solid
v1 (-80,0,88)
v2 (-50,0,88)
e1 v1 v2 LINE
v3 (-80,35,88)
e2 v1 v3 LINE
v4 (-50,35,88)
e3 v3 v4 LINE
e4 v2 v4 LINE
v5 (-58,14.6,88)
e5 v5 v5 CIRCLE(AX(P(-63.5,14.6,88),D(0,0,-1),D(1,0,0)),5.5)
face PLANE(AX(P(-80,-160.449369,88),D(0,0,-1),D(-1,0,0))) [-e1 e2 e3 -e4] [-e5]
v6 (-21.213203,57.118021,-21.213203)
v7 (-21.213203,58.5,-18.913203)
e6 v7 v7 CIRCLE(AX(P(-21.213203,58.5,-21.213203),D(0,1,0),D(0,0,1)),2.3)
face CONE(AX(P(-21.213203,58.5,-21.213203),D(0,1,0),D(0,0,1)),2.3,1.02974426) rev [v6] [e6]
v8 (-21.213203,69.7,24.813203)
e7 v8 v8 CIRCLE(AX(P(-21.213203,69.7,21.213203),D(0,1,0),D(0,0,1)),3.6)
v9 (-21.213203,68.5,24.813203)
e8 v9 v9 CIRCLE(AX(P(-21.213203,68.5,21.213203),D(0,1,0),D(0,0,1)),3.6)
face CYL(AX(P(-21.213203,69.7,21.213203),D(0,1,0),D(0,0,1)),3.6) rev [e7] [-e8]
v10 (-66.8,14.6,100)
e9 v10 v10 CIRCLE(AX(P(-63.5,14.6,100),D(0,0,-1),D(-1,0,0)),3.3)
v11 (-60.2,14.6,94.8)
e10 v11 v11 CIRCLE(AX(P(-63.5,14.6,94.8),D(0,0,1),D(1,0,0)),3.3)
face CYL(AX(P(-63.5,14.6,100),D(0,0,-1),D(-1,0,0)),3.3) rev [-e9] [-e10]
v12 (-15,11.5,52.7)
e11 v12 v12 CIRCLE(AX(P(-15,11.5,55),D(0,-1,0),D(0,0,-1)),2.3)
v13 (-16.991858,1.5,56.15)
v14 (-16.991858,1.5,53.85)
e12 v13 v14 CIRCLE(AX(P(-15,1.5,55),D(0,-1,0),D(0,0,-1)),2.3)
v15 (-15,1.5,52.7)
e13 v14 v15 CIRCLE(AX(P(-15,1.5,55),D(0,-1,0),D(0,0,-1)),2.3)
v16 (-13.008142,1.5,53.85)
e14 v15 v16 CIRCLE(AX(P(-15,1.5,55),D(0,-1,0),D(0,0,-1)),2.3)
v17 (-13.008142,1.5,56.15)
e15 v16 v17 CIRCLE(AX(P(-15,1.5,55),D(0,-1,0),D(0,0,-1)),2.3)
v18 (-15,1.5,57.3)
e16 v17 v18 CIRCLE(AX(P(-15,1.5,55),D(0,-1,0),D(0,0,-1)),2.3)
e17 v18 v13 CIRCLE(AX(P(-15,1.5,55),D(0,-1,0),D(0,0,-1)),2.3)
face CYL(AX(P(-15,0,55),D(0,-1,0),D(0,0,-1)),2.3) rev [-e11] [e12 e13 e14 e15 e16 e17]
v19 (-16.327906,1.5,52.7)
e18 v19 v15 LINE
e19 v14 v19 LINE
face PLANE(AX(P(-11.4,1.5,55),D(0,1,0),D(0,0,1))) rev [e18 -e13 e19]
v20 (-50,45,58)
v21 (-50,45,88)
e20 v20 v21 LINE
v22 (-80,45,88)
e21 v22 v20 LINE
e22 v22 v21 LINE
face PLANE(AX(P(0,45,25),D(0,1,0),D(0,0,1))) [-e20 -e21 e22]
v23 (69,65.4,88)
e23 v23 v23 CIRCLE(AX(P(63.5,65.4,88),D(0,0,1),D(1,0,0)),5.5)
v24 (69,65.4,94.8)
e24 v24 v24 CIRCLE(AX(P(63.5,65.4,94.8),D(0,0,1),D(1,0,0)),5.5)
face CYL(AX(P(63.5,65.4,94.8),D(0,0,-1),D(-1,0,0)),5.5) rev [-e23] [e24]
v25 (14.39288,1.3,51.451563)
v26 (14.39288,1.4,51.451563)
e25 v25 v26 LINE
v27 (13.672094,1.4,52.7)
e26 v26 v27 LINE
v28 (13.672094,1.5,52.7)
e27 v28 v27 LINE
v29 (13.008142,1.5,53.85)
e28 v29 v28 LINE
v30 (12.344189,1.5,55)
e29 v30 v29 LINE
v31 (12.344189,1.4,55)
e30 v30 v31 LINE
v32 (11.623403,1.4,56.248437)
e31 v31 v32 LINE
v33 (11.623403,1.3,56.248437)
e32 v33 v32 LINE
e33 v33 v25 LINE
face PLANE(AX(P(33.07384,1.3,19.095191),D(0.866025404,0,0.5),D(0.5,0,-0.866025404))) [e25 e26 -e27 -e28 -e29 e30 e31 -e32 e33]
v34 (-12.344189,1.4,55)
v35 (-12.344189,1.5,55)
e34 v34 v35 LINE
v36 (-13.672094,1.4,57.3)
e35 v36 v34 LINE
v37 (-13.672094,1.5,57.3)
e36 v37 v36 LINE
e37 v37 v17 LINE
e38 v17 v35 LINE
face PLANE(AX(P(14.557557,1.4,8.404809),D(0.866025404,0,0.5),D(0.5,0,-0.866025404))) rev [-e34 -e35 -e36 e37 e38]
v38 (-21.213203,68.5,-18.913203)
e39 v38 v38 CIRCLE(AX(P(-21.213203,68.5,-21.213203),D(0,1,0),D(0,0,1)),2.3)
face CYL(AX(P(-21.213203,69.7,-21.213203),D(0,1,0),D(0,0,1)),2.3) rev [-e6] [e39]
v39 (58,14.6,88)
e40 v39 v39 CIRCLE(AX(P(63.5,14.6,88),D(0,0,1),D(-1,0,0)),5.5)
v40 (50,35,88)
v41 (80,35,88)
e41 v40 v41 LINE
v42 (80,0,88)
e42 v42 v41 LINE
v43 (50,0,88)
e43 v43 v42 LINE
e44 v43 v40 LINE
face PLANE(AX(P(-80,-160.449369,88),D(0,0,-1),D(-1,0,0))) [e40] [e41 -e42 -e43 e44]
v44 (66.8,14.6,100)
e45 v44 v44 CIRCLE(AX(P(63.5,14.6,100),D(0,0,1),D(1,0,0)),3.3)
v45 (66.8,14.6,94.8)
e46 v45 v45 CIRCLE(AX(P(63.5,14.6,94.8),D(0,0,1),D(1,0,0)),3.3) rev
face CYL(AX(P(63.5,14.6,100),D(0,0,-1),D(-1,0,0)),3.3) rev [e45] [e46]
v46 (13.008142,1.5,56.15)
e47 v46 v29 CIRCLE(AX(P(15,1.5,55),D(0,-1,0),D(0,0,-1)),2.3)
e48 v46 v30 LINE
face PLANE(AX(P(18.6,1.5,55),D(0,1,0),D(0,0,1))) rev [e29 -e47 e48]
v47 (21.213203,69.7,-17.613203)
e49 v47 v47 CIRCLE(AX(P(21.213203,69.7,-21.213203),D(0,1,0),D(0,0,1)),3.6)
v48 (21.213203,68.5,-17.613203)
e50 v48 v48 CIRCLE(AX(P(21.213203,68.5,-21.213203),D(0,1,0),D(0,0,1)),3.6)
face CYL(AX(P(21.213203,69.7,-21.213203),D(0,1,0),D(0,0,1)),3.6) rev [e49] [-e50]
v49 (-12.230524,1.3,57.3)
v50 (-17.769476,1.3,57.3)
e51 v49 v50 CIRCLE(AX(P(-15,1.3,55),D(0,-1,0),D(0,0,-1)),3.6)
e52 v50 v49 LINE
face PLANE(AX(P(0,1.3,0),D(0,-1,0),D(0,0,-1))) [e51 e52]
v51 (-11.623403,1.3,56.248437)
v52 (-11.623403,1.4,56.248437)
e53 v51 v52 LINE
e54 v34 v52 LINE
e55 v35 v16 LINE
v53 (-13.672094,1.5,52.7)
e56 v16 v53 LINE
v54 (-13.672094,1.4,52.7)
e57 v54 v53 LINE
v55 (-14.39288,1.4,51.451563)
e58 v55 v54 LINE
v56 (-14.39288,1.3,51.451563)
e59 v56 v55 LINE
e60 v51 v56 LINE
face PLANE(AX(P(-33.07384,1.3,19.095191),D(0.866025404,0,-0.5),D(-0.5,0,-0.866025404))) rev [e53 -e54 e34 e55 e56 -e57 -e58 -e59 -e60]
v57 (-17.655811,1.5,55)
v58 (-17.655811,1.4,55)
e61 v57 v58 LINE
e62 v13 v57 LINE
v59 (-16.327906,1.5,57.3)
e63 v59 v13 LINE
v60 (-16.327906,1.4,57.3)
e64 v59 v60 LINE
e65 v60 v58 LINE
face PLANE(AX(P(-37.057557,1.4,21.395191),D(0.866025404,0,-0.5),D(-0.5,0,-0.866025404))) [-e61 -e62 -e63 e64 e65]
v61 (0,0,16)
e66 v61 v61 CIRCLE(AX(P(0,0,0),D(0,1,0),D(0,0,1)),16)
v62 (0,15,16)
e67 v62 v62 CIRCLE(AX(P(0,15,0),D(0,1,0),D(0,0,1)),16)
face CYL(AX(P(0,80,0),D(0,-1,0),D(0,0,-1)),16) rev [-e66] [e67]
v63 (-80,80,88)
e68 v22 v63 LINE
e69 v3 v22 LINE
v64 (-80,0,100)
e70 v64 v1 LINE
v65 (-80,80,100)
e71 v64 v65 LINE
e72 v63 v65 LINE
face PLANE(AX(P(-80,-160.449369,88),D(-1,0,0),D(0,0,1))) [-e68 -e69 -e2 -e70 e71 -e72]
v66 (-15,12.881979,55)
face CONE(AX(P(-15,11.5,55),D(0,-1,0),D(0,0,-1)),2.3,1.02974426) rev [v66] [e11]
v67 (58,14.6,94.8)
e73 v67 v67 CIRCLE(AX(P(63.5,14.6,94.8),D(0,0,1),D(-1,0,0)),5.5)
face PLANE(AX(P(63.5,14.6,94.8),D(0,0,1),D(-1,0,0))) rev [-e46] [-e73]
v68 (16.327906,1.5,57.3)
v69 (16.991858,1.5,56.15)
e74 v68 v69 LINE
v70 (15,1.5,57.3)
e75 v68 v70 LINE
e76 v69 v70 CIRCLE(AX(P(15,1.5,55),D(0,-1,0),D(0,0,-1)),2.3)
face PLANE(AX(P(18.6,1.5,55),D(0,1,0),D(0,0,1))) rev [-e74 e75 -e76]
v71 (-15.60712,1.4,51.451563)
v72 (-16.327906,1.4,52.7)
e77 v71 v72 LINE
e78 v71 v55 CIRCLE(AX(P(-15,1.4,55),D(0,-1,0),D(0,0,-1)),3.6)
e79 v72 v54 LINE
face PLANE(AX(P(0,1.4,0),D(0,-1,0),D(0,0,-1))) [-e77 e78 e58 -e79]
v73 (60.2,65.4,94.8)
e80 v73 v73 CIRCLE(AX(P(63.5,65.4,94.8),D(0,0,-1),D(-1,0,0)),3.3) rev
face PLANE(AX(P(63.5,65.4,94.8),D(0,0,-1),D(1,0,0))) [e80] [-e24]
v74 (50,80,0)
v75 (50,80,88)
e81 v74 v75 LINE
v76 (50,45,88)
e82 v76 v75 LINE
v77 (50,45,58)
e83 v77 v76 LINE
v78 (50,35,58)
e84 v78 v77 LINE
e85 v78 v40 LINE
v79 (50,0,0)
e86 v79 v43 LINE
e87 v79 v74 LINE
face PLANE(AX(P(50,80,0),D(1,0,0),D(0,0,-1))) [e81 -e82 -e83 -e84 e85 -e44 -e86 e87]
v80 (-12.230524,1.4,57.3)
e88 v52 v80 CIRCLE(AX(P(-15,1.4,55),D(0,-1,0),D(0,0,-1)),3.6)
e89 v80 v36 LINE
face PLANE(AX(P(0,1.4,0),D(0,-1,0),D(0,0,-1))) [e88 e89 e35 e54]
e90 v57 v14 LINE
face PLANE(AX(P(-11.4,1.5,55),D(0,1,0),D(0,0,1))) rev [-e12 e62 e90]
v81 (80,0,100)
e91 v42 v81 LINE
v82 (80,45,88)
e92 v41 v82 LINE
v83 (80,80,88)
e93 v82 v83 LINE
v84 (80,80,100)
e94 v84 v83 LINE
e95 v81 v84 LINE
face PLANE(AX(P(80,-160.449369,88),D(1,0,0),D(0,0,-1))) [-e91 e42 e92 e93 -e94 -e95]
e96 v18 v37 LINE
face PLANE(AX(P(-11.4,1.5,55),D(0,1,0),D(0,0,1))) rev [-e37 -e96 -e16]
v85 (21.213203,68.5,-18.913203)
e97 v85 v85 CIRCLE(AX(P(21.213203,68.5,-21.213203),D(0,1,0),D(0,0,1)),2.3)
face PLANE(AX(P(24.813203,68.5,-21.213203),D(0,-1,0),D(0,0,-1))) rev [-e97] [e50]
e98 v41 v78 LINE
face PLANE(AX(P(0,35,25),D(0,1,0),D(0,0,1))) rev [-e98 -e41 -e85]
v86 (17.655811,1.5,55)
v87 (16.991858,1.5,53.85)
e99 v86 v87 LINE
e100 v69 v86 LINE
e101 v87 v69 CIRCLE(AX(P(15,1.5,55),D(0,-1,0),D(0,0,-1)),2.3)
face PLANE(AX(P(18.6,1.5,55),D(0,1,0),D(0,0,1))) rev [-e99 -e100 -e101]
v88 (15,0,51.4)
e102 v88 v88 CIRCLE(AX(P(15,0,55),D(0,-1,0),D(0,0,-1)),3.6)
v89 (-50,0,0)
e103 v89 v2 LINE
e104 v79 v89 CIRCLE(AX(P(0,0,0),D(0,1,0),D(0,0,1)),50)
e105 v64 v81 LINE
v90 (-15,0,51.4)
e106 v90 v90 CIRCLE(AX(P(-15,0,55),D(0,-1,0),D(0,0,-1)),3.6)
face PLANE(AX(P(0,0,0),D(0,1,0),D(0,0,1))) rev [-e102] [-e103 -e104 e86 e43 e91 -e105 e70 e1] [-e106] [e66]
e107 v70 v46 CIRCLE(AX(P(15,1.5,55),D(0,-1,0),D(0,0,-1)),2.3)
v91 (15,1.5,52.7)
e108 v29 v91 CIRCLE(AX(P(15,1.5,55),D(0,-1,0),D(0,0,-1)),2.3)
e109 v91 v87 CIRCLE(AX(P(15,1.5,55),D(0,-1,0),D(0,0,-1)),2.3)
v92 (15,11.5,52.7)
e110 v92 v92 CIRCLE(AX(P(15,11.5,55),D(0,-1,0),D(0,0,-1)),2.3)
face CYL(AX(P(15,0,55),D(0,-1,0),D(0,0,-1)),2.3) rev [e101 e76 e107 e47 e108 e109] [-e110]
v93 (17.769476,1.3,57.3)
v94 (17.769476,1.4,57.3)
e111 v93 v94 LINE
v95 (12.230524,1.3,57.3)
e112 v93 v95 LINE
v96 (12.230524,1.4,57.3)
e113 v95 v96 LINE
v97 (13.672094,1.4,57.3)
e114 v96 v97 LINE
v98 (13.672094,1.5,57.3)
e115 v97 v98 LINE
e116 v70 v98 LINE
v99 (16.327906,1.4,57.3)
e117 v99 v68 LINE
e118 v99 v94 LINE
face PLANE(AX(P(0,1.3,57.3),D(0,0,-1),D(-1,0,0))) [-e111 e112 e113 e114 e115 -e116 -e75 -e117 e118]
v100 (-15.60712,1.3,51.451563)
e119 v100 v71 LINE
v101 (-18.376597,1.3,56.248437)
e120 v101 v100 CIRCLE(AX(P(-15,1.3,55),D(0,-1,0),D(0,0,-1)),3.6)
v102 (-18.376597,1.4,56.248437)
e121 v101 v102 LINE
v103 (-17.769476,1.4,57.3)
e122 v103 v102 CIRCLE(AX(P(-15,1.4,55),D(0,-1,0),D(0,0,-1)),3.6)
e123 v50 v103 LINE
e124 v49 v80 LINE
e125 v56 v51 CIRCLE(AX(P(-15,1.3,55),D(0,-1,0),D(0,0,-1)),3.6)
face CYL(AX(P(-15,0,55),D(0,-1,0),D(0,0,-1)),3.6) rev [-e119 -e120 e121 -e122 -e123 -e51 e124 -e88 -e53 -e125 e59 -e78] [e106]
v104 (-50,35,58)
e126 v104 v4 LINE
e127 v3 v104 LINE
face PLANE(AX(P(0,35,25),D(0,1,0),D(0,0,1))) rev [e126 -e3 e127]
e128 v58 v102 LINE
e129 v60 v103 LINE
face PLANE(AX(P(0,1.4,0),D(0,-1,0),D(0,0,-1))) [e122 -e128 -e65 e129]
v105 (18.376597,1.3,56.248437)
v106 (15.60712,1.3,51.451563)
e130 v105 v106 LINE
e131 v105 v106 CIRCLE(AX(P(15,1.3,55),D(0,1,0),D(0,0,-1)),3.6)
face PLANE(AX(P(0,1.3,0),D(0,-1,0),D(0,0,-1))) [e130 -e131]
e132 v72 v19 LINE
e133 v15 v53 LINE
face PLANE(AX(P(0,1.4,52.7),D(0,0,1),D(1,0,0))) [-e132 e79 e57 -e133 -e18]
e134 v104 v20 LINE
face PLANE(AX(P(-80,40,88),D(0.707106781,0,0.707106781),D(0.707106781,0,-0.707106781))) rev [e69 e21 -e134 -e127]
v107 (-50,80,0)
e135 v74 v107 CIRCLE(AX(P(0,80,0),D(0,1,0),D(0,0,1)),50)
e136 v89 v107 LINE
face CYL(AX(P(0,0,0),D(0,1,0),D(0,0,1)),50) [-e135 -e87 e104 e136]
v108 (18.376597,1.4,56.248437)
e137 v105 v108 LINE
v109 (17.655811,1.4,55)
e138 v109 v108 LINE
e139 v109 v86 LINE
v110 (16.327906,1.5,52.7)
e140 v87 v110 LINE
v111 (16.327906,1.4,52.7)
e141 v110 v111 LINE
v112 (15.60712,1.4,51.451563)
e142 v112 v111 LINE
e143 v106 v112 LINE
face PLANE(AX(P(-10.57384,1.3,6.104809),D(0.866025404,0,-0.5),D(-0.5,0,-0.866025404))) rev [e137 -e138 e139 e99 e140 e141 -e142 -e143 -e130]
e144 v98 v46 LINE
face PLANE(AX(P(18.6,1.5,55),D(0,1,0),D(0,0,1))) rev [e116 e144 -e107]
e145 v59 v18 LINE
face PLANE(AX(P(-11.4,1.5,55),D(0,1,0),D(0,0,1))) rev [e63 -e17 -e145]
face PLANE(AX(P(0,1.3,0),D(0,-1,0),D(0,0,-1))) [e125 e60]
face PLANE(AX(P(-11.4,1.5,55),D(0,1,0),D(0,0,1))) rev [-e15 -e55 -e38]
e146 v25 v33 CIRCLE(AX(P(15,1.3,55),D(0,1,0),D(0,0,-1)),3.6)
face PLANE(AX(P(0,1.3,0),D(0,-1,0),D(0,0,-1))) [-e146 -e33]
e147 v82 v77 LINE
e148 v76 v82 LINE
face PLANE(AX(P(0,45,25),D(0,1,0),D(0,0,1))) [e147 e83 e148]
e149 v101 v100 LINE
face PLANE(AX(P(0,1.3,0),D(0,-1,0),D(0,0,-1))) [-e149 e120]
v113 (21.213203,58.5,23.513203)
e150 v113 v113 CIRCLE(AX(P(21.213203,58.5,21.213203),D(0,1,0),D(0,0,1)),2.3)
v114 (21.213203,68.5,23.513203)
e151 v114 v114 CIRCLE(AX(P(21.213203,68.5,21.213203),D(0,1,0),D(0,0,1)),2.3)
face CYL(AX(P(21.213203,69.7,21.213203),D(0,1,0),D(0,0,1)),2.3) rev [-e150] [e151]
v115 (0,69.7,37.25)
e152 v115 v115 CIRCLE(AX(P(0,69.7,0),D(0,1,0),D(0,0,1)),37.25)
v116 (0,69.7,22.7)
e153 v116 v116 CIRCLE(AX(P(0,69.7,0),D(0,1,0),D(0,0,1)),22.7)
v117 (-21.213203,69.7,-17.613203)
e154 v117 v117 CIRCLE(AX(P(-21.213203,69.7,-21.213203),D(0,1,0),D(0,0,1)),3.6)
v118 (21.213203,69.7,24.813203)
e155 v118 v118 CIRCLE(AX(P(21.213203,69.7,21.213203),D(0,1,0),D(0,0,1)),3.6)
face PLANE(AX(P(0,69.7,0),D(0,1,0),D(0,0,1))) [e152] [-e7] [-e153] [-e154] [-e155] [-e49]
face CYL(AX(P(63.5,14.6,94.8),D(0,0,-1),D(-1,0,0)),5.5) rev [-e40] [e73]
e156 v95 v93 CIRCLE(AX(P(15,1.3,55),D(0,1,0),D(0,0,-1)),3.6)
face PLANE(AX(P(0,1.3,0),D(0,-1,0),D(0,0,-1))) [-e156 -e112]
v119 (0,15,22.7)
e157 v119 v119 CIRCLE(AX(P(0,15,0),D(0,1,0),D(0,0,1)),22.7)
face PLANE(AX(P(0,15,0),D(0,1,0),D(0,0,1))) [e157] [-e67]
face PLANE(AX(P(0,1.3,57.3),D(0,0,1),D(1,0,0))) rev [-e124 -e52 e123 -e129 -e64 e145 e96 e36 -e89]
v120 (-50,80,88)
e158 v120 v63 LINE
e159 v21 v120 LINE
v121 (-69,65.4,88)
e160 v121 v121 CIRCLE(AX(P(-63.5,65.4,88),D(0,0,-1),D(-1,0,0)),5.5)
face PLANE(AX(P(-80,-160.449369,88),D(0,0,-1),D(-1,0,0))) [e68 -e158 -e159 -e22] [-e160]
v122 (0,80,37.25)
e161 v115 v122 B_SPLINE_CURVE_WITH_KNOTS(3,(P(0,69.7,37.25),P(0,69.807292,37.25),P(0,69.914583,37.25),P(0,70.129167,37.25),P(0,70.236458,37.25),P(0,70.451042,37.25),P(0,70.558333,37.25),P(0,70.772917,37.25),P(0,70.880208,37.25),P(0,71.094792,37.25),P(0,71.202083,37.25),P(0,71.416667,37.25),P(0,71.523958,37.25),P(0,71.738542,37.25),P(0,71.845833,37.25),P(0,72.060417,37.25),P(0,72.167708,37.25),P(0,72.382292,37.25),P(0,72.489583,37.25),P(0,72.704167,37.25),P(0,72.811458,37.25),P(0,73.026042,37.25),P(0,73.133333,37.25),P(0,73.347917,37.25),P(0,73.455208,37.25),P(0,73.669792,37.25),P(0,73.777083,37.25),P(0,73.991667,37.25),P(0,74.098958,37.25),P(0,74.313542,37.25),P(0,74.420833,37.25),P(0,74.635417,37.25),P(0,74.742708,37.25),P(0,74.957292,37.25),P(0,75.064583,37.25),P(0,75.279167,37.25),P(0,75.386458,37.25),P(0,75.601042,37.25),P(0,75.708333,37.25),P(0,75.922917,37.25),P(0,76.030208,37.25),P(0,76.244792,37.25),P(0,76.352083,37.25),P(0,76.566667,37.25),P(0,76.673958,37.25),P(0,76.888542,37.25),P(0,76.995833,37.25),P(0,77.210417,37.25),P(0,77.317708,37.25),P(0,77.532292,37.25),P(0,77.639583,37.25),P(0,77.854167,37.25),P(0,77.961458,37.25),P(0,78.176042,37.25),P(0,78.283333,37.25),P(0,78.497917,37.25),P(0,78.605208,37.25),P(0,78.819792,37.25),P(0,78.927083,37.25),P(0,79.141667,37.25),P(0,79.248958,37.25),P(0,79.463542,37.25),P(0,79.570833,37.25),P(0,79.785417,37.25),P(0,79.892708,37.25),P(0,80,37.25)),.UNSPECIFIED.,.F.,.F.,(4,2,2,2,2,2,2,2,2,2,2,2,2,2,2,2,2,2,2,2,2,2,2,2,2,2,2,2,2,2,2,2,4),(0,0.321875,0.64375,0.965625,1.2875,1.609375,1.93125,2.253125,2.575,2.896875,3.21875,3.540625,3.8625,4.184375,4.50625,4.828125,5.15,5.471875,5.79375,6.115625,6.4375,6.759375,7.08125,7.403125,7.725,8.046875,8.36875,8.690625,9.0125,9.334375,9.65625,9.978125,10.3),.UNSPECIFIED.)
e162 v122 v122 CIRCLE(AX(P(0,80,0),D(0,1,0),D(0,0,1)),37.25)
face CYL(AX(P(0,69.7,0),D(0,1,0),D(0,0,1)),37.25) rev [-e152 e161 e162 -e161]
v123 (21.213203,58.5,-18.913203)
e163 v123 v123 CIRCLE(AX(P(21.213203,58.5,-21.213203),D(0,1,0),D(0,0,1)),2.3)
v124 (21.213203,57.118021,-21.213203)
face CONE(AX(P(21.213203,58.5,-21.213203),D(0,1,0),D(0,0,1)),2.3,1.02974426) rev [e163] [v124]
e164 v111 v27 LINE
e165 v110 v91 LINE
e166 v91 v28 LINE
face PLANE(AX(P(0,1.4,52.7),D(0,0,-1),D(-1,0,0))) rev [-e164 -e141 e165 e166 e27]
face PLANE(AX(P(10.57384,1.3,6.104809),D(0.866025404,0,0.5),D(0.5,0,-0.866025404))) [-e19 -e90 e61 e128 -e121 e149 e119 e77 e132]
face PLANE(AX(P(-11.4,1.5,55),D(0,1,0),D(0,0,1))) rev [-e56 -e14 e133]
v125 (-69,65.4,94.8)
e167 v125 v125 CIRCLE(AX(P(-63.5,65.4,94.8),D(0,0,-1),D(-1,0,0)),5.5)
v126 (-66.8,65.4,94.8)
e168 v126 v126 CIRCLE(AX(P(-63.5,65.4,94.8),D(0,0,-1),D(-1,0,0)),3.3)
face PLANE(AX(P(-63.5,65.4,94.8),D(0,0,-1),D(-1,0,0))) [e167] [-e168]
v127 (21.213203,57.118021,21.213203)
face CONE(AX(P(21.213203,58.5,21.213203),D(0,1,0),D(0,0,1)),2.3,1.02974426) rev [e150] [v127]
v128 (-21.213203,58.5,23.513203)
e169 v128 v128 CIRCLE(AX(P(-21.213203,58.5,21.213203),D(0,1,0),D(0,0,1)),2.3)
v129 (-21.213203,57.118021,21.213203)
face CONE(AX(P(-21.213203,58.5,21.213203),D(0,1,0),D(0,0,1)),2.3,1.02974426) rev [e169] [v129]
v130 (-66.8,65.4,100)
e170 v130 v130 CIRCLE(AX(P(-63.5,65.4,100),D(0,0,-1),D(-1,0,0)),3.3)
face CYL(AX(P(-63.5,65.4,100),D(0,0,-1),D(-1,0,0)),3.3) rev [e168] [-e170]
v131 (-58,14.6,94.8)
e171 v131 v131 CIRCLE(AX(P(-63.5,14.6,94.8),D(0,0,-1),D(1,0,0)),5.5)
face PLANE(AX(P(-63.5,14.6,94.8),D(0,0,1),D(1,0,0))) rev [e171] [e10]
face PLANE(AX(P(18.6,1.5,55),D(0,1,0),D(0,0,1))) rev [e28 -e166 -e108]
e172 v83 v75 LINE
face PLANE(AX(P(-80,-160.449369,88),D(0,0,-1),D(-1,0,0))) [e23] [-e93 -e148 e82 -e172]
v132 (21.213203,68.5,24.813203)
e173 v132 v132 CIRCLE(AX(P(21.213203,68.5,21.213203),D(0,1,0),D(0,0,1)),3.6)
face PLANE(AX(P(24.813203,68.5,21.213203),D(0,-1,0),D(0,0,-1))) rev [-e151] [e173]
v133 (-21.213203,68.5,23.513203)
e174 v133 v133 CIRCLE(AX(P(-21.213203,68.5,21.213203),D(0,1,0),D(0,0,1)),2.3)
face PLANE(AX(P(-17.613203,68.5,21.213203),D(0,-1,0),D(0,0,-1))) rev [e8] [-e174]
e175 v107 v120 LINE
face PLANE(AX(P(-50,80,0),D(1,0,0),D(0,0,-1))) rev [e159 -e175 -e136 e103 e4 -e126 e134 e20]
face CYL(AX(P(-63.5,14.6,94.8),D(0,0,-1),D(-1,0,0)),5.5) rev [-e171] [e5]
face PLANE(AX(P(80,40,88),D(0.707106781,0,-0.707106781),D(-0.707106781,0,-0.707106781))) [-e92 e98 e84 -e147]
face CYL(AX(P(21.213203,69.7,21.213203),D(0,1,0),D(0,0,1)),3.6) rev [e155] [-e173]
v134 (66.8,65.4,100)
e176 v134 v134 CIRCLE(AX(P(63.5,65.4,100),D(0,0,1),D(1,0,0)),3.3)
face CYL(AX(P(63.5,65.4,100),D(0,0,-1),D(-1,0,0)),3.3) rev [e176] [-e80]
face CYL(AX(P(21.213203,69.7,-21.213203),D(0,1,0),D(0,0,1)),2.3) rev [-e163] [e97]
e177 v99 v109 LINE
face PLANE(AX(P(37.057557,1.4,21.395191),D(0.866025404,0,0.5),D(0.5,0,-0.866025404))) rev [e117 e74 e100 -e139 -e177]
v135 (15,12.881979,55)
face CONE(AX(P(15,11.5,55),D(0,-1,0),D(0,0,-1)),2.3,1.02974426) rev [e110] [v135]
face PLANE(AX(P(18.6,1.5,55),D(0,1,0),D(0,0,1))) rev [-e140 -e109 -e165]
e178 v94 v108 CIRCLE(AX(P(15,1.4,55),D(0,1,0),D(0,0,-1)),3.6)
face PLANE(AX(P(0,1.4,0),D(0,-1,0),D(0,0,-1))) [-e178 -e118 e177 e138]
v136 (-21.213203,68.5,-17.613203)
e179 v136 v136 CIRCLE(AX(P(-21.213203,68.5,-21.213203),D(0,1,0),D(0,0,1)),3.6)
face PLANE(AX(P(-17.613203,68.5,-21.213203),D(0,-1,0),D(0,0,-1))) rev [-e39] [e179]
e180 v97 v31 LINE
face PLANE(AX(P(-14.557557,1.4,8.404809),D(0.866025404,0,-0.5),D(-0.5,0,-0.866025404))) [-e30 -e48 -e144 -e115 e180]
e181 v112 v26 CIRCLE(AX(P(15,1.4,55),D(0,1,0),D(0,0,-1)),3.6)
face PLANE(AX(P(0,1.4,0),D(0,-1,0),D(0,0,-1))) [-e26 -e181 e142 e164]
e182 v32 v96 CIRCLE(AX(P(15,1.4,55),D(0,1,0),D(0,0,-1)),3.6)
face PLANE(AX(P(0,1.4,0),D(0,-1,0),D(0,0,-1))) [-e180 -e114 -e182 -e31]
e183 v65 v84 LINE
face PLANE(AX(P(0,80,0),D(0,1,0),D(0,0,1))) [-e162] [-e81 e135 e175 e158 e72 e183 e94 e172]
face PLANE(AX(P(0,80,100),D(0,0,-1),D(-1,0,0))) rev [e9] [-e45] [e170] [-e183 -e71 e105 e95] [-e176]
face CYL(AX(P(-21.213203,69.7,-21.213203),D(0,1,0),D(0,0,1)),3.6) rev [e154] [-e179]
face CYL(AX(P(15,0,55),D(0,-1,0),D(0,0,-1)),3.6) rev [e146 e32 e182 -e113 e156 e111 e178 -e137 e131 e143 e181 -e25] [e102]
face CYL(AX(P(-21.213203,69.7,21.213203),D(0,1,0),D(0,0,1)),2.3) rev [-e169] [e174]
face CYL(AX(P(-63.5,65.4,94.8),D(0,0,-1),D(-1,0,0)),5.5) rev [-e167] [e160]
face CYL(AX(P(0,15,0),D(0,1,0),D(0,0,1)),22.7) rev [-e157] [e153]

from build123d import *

# Parameters (mm, degrees)
EXTRUDE_1_DEPTH          = 80
SKETCH_3_R               = 37.25
CUT_EXTRUDE_1_DEPTH      = 10.3
SKETCH_4_R               = 22.7
CUT_EXTRUDE_2_DEPTH      = 65
CUT_EXTRUDE_3_DEPTH      = 138.477270849
SKETCH_6_W               = 160
SKETCH_6_H               = 12
EXTRUDE_2_DEPTH          = 80
SKETCH_8_R               = 5.5
CUT_EXTRUDE_4_DEPTH      = 6.8
SKETCH_9_R               = 3.3
CUT_EXTRUDE_5_DEPTH      = 179.44887223
RIB_START                = -5
RIB_1_DEPTH              = 10
PATTERN_CIRCULAR_1_COUNT = 4
EXTRUDE_3_DEPTH          = 0.1
EXTRUDE_4_DEPTH          = 0.2


# Read off the part's stored shape, not the designer's step: 筋1, 高级异型孔1, 高级异型孔2
with BuildPart() as part:
    # 草图1 → 凸台-拉伸1 (new body)
    with BuildSketch(Plane(origin=(0, 0, 0), x_dir=(1, 0, 0), z_dir=(0, 1, 0))):
        with BuildLine():
            Line((-50, -100), (0, -100))
            Line((0, -100), (0, -37.3))
            ThreePointArc((0, -37.3), (-37.3, 0), (0, 37.3))
            Line((0, 37.3), (0, 60))
            Line((0, 60), (-50, 60))
            Line((-50, 60), (-50, -100))
        make_face()
        with BuildLine():
            Line((0, -37.3), (0, -100))
            Line((0, -100), (50, -100))
            Line((50, -100), (50, 60))
            Line((50, 60), (0, 60))
            Line((0, 60), (0, 37.3))
            ThreePointArc((0, 37.3), (26.375082938, 26.375082938), (37.3, 0))
            ThreePointArc((37.3, 0), (26.375082938, -26.375082938), (0, -37.3))
        make_face()
        with BuildLine():
            ThreePointArc((0, 37.3), (-37.3, 0), (0, -37.3))
            Line((0, -37.3), (0, -16))
            ThreePointArc((0, -16), (-16, 0), (0, 16))
            Line((0, 16), (0, 37.3))
        make_face()
        with BuildLine():
            Line((0, -16), (0, -37.3))
            ThreePointArc((0, -37.3), (26.375082938, -26.375082938), (37.3, 0))
            ThreePointArc((37.3, 0), (26.375082938, 26.375082938), (0, 37.3))
            Line((0, 37.3), (0, 16))
            ThreePointArc((0, 16), (11.313708499, 11.313708499), (16, 0))
            ThreePointArc((16, 0), (11.313708499, -11.313708499), (0, -16))
        make_face()
    extrude(amount=EXTRUDE_1_DEPTH)

    # 草图3 → 切除-拉伸1 (cut)
    with BuildSketch(Plane(origin=(0, 80, 0), x_dir=(1, 0, 0), z_dir=(0, 1, 0))):
        with Locations(Location((0, 0, 0), (0, 0, 270))):
            Circle(SKETCH_3_R)
    extrude(amount=-CUT_EXTRUDE_1_DEPTH, mode=Mode.SUBTRACT)

    # 草图4 → 切除-拉伸2 (cut)
    with BuildSketch(Plane(origin=(0, 80, 0), x_dir=(1, 0, 0), z_dir=(0, 1, 0))):
        with Locations(Location((0, 0, 0), (0, 0, 270))):
            Circle(SKETCH_4_R)
    extrude(amount=-CUT_EXTRUDE_2_DEPTH, mode=Mode.SUBTRACT)

    # 草图5 → 切除-拉伸3 (cut, through all)
    with BuildSketch(Plane(origin=(0, 80, 0), x_dir=(1, 0, 0), z_dir=(0, 1, 0))):
        with BuildLine():
            ThreePointArc((-50, 1.43e-07), (7.1e-08, 50), (50, 0))
            Line((50, 0), (50, 60))
            Line((50, 60), (-50, 60))
            Line((-50, 60), (-50, 1.43e-07))
        make_face()
    extrude(amount=-CUT_EXTRUDE_3_DEPTH, mode=Mode.SUBTRACT)

    # 草图6 → 凸台-拉伸2 (add)
    with BuildSketch(Plane(origin=(0, 80, 0), x_dir=(1, 0, 0), z_dir=(0, 1, 0))):
        with Locations((0, -94)):
            Rectangle(SKETCH_6_W, SKETCH_6_H)
    extrude(amount=-EXTRUDE_2_DEPTH)

    # 草图8 → 切除-拉伸4 (cut)
    with BuildSketch(Plane(origin=(0, 0, 88), x_dir=(-1, 0, 0), z_dir=(0, 0, -1))):
        with Locations((63.5, 65.4)):
            Circle(SKETCH_8_R)
        with Locations(Location((63.5, 14.6, 0), (0, 0, 180))):
            Circle(SKETCH_8_R)
    cut_extrude_4 = extrude(amount=-CUT_EXTRUDE_4_DEPTH, mode=Mode.SUBTRACT)

    # 草图9 → 切除-拉伸5 (cut, through all)
    with BuildSketch(Plane(origin=(0, 0, 88), x_dir=(-1, 0, 0), z_dir=(0, 0, -1))):
        with Locations((63.5, 65.4)):
            Circle(SKETCH_9_R)
        with Locations((63.5, 14.6)):
            Circle(SKETCH_9_R)
    cut_extrude_5 = extrude(amount=-CUT_EXTRUDE_5_DEPTH, mode=Mode.SUBTRACT)

    # 镜向1: 切除-拉伸4, 切除-拉伸5 across plane
    add(cut_extrude_4.mirror(Plane(origin=(0, 0, 0), x_dir=(0, 0, 1), z_dir=(1, 0, 0))), mode=Mode.SUBTRACT)
    add(cut_extrude_5.mirror(Plane(origin=(0, 0, 0), x_dir=(0, 0, 1), z_dir=(1, 0, 0))), mode=Mode.SUBTRACT)

    # 筋1 outline → 筋1 (add)
    with BuildSketch(Plane(origin=(0, 40, 0), x_dir=(1, 0, 0), z_dir=(0, 1, 0)).offset(RIB_START)):
        Polygon((-50, -58), (-80, -88), (-50, -88), align=None)
    rib_1 = extrude(amount=RIB_1_DEPTH)

    # 镜向2: 筋1 across plane
    add(rib_1.mirror(Plane(origin=(0, 0, 0), x_dir=(0, 0, 1), z_dir=(1, 0, 0))))

    # 高级异型孔1 outline → 高级异型孔1 (revolve, cut)
    with BuildSketch(Plane(origin=(21.213203436, 0, -21.213203436), x_dir=(1, 0, 0), z_dir=(0, 0, 1))):
        Polygon((2.3, 68.5), (3.6, 68.5), (3.6, 69.7), (0, 69.7), (0, 57.11802058), (2.3, 58.5), align=None)
    other_1 = revolve(axis=Axis((21.213203436, 0, -21.213203436), (0, 1, 0)), mode=Mode.SUBTRACT)

    # 阵列(圆周)1: 高级异型孔1 ×4 about axis
    pattern_circular_1_axis = Axis((0, 0, 0), (0, 1, 0))
    for i in range(1, PATTERN_CIRCULAR_1_COUNT):
        add(other_1.rotate(pattern_circular_1_axis, i * 360 / PATTERN_CIRCULAR_1_COUNT), mode=Mode.SUBTRACT)

    # 高级异型孔2 outline → 高级异型孔2 (revolve, cut)
    with BuildSketch(Plane(origin=(15, 0, 55), x_dir=(1, 0, 0), z_dir=(0, 0, 1))):
        Polygon((3.6, 0), (3.6, 1.5), (2.3, 1.5), (2.3, 11.5), (0, 12.88197942), (0, 0), align=None)
    revolve(axis=Axis((15, 0, 55), (0, 1, 0)), mode=Mode.SUBTRACT)

    # Other 2 2 outline → Other 2 2 (revolve, cut)
    with BuildSketch(Plane(origin=(-15, 0, 55), x_dir=(1, 0, 0), z_dir=(0, 0, 1))):
        Polygon((0, 0), (3.6, 0), (3.6, 1.5), (2.3, 1.5), (2.3, 11.5), (0, 12.88197942), align=None)
    revolve(axis=Axis((-15, 0, 55), (0, 1, 0)), mode=Mode.SUBTRACT)

    # 草图14 → 凸台-拉伸3 (add)
    with BuildSketch(Plane.XZ.offset(-1.5)):
        with BuildLine():
            Line((-16.327905619, 57.3), (-15.607120186, 58.548436991))
            ThreePointArc((-15.607120186, 58.548436991), (-16.8, 58.117691454), (-17.769476485, 57.3))
            Line((-17.769476485, 57.3), (-16.327905619, 57.3))
        make_face()
        with BuildLine():
            Line((-17.655811238, 55), (-16.327905619, 57.3))
            Line((-16.327905619, 57.3), (-17.769476485, 57.3))
            ThreePointArc((-17.769476485, 57.3), (-18.117691454, 56.8), (-18.376596671, 56.248436991))
            Line((-18.376596671, 56.248436991), (-17.655811238, 55))
        make_face()
        with BuildLine():
            Line((-18.376596671, 53.751563009), (-17.655811238, 55))
            Line((-17.655811238, 55), (-18.376596671, 56.248436991))
            ThreePointArc((-18.376596671, 56.248436991), (-18.6, 55), (-18.376596671, 53.751563009))
        make_face()
        with BuildLine():
            Line((-15.607120186, 51.451563009), (-16.327905619, 52.7))
            Line((-16.327905619, 52.7), (-17.769476485, 52.7))
            ThreePointArc((-17.769476485, 52.7), (-16.8, 51.882308546), (-15.607120186, 51.451563009))
        make_face()
        with BuildLine():
            Line((-13.672094381, 52.7), (-16.327905619, 52.7))
            Line((-16.327905619, 52.7), (-15.607120186, 51.451563009))
            ThreePointArc((-15.607120186, 51.451563009), (-15, 51.4), (-14.392879814, 51.451563009))
            Line((-14.392879814, 51.451563009), (-13.672094381, 52.7))
        make_face()
        with BuildLine():
            Line((-12.230523515, 52.7), (-13.672094381, 52.7))
            Line((-13.672094381, 52.7), (-14.392879814, 51.451563009))
            ThreePointArc((-14.392879814, 51.451563009), (-13.2, 51.882308546), (-12.230523515, 52.7))
        make_face()
        with BuildLine():
            Line((-11.623403329, 56.248436991), (-12.344188762, 55))
            Line((-12.344188762, 55), (-11.623403329, 53.751563009))
            ThreePointArc((-11.623403329, 53.751563009), (-11.456290925, 54.365865951), (-11.4, 55))
            ThreePointArc((-11.4, 55), (-11.456290925, 55.634134049), (-11.623403329, 56.248436991))
        make_face()
        with BuildLine():
            Line((-12.230523515, 57.3), (-13.672094381, 57.3))
            Line((-13.672094381, 57.3), (-12.344188762, 55))
            Line((-12.344188762, 55), (-11.623403329, 56.248436991))
            ThreePointArc((-11.623403329, 56.248436991), (-11.882308546, 56.8), (-12.230523515, 57.3))
        make_face()
        with BuildLine():
            ThreePointArc((-12.230523515, 57.3), (-13.2, 58.117691454), (-14.392879814, 58.548436991))
            Line((-14.392879814, 58.548436991), (-13.672094381, 57.3))
            Line((-13.672094381, 57.3), (-12.230523515, 57.3))
        make_face()
    extrude_3 = extrude(amount=EXTRUDE_3_DEPTH)

    # 草图14<3> → 凸台-拉伸4 (add)
    with BuildSketch(Plane.XZ.offset(-1.5)):
        with BuildLine():
            Line((-16.327905619, 52.7), (-17.655811238, 55))
            Line((-17.655811238, 55), (-18.376596671, 53.751563009))
            ThreePointArc((-18.376596671, 53.751563009), (-18.117691454, 53.2), (-17.769476485, 52.7))
            Line((-17.769476485, 52.7), (-16.327905619, 52.7))
        make_face()
        with BuildLine():
            Line((-18.376596671, 53.751563009), (-17.655811238, 55))
            Line((-17.655811238, 55), (-18.376596671, 56.248436991))
            ThreePointArc((-18.376596671, 56.248436991), (-18.6, 55), (-18.376596671, 53.751563009))
        make_face()
        with BuildLine():
            Line((-15.607120186, 51.451563009), (-16.327905619, 52.7))
            Line((-16.327905619, 52.7), (-17.769476485, 52.7))
            ThreePointArc((-17.769476485, 52.7), (-16.8, 51.882308546), (-15.607120186, 51.451563009))
        make_face()
        with BuildLine():
            Line((-12.230523515, 52.7), (-13.672094381, 52.7))
            Line((-13.672094381, 52.7), (-14.392879814, 51.451563009))
            ThreePointArc((-14.392879814, 51.451563009), (-13.2, 51.882308546), (-12.230523515, 52.7))
        make_face()
        with BuildLine():
            Line((-11.623403329, 53.751563009), (-12.344188762, 55))
            Line((-12.344188762, 55), (-13.672094381, 52.7))
            Line((-13.672094381, 52.7), (-12.230523515, 52.7))
            ThreePointArc((-12.230523515, 52.7), (-11.882308546, 53.2), (-11.623403329, 53.751563009))
        make_face()
        with BuildLine():
            Line((-11.623403329, 56.248436991), (-12.344188762, 55))
            Line((-12.344188762, 55), (-11.623403329, 53.751563009))
            ThreePointArc((-11.623403329, 53.751563009), (-11.456290925, 54.365865951), (-11.4, 55))
            ThreePointArc((-11.4, 55), (-11.456290925, 55.634134049), (-11.623403329, 56.248436991))
        make_face()
        with BuildLine():
            ThreePointArc((-12.230523515, 57.3), (-13.2, 58.117691454), (-14.392879814, 58.548436991))
            Line((-14.392879814, 58.548436991), (-13.672094381, 57.3))
            Line((-13.672094381, 57.3), (-12.230523515, 57.3))
        make_face()
        with BuildLine():
            ThreePointArc((-14.392879814, 58.548436991), (-15, 58.6), (-15.607120186, 58.548436991))
            Line((-15.607120186, 58.548436991), (-16.327905619, 57.3))
            Line((-16.327905619, 57.3), (-13.672094381, 57.3))
            Line((-13.672094381, 57.3), (-14.392879814, 58.548436991))
        make_face()
        with BuildLine():
            Line((-16.327905619, 57.3), (-15.607120186, 58.548436991))
            ThreePointArc((-15.607120186, 58.548436991), (-16.8, 58.117691454), (-17.769476485, 57.3))
            Line((-17.769476485, 57.3), (-16.327905619, 57.3))
        make_face()
    extrude_4 = extrude(amount=EXTRUDE_4_DEPTH)

    # 镜向3: 凸台-拉伸3, 凸台-拉伸4 across plane
    add(extrude_3.mirror(Plane(origin=(0, 0, 0), x_dir=(0, 0, 1), z_dir=(1, 0, 0))))
    add(extrude_4.mirror(Plane(origin=(0, 0, 0), x_dir=(0, 0, 1), z_dir=(1, 0, 0))))


solid = part.part
